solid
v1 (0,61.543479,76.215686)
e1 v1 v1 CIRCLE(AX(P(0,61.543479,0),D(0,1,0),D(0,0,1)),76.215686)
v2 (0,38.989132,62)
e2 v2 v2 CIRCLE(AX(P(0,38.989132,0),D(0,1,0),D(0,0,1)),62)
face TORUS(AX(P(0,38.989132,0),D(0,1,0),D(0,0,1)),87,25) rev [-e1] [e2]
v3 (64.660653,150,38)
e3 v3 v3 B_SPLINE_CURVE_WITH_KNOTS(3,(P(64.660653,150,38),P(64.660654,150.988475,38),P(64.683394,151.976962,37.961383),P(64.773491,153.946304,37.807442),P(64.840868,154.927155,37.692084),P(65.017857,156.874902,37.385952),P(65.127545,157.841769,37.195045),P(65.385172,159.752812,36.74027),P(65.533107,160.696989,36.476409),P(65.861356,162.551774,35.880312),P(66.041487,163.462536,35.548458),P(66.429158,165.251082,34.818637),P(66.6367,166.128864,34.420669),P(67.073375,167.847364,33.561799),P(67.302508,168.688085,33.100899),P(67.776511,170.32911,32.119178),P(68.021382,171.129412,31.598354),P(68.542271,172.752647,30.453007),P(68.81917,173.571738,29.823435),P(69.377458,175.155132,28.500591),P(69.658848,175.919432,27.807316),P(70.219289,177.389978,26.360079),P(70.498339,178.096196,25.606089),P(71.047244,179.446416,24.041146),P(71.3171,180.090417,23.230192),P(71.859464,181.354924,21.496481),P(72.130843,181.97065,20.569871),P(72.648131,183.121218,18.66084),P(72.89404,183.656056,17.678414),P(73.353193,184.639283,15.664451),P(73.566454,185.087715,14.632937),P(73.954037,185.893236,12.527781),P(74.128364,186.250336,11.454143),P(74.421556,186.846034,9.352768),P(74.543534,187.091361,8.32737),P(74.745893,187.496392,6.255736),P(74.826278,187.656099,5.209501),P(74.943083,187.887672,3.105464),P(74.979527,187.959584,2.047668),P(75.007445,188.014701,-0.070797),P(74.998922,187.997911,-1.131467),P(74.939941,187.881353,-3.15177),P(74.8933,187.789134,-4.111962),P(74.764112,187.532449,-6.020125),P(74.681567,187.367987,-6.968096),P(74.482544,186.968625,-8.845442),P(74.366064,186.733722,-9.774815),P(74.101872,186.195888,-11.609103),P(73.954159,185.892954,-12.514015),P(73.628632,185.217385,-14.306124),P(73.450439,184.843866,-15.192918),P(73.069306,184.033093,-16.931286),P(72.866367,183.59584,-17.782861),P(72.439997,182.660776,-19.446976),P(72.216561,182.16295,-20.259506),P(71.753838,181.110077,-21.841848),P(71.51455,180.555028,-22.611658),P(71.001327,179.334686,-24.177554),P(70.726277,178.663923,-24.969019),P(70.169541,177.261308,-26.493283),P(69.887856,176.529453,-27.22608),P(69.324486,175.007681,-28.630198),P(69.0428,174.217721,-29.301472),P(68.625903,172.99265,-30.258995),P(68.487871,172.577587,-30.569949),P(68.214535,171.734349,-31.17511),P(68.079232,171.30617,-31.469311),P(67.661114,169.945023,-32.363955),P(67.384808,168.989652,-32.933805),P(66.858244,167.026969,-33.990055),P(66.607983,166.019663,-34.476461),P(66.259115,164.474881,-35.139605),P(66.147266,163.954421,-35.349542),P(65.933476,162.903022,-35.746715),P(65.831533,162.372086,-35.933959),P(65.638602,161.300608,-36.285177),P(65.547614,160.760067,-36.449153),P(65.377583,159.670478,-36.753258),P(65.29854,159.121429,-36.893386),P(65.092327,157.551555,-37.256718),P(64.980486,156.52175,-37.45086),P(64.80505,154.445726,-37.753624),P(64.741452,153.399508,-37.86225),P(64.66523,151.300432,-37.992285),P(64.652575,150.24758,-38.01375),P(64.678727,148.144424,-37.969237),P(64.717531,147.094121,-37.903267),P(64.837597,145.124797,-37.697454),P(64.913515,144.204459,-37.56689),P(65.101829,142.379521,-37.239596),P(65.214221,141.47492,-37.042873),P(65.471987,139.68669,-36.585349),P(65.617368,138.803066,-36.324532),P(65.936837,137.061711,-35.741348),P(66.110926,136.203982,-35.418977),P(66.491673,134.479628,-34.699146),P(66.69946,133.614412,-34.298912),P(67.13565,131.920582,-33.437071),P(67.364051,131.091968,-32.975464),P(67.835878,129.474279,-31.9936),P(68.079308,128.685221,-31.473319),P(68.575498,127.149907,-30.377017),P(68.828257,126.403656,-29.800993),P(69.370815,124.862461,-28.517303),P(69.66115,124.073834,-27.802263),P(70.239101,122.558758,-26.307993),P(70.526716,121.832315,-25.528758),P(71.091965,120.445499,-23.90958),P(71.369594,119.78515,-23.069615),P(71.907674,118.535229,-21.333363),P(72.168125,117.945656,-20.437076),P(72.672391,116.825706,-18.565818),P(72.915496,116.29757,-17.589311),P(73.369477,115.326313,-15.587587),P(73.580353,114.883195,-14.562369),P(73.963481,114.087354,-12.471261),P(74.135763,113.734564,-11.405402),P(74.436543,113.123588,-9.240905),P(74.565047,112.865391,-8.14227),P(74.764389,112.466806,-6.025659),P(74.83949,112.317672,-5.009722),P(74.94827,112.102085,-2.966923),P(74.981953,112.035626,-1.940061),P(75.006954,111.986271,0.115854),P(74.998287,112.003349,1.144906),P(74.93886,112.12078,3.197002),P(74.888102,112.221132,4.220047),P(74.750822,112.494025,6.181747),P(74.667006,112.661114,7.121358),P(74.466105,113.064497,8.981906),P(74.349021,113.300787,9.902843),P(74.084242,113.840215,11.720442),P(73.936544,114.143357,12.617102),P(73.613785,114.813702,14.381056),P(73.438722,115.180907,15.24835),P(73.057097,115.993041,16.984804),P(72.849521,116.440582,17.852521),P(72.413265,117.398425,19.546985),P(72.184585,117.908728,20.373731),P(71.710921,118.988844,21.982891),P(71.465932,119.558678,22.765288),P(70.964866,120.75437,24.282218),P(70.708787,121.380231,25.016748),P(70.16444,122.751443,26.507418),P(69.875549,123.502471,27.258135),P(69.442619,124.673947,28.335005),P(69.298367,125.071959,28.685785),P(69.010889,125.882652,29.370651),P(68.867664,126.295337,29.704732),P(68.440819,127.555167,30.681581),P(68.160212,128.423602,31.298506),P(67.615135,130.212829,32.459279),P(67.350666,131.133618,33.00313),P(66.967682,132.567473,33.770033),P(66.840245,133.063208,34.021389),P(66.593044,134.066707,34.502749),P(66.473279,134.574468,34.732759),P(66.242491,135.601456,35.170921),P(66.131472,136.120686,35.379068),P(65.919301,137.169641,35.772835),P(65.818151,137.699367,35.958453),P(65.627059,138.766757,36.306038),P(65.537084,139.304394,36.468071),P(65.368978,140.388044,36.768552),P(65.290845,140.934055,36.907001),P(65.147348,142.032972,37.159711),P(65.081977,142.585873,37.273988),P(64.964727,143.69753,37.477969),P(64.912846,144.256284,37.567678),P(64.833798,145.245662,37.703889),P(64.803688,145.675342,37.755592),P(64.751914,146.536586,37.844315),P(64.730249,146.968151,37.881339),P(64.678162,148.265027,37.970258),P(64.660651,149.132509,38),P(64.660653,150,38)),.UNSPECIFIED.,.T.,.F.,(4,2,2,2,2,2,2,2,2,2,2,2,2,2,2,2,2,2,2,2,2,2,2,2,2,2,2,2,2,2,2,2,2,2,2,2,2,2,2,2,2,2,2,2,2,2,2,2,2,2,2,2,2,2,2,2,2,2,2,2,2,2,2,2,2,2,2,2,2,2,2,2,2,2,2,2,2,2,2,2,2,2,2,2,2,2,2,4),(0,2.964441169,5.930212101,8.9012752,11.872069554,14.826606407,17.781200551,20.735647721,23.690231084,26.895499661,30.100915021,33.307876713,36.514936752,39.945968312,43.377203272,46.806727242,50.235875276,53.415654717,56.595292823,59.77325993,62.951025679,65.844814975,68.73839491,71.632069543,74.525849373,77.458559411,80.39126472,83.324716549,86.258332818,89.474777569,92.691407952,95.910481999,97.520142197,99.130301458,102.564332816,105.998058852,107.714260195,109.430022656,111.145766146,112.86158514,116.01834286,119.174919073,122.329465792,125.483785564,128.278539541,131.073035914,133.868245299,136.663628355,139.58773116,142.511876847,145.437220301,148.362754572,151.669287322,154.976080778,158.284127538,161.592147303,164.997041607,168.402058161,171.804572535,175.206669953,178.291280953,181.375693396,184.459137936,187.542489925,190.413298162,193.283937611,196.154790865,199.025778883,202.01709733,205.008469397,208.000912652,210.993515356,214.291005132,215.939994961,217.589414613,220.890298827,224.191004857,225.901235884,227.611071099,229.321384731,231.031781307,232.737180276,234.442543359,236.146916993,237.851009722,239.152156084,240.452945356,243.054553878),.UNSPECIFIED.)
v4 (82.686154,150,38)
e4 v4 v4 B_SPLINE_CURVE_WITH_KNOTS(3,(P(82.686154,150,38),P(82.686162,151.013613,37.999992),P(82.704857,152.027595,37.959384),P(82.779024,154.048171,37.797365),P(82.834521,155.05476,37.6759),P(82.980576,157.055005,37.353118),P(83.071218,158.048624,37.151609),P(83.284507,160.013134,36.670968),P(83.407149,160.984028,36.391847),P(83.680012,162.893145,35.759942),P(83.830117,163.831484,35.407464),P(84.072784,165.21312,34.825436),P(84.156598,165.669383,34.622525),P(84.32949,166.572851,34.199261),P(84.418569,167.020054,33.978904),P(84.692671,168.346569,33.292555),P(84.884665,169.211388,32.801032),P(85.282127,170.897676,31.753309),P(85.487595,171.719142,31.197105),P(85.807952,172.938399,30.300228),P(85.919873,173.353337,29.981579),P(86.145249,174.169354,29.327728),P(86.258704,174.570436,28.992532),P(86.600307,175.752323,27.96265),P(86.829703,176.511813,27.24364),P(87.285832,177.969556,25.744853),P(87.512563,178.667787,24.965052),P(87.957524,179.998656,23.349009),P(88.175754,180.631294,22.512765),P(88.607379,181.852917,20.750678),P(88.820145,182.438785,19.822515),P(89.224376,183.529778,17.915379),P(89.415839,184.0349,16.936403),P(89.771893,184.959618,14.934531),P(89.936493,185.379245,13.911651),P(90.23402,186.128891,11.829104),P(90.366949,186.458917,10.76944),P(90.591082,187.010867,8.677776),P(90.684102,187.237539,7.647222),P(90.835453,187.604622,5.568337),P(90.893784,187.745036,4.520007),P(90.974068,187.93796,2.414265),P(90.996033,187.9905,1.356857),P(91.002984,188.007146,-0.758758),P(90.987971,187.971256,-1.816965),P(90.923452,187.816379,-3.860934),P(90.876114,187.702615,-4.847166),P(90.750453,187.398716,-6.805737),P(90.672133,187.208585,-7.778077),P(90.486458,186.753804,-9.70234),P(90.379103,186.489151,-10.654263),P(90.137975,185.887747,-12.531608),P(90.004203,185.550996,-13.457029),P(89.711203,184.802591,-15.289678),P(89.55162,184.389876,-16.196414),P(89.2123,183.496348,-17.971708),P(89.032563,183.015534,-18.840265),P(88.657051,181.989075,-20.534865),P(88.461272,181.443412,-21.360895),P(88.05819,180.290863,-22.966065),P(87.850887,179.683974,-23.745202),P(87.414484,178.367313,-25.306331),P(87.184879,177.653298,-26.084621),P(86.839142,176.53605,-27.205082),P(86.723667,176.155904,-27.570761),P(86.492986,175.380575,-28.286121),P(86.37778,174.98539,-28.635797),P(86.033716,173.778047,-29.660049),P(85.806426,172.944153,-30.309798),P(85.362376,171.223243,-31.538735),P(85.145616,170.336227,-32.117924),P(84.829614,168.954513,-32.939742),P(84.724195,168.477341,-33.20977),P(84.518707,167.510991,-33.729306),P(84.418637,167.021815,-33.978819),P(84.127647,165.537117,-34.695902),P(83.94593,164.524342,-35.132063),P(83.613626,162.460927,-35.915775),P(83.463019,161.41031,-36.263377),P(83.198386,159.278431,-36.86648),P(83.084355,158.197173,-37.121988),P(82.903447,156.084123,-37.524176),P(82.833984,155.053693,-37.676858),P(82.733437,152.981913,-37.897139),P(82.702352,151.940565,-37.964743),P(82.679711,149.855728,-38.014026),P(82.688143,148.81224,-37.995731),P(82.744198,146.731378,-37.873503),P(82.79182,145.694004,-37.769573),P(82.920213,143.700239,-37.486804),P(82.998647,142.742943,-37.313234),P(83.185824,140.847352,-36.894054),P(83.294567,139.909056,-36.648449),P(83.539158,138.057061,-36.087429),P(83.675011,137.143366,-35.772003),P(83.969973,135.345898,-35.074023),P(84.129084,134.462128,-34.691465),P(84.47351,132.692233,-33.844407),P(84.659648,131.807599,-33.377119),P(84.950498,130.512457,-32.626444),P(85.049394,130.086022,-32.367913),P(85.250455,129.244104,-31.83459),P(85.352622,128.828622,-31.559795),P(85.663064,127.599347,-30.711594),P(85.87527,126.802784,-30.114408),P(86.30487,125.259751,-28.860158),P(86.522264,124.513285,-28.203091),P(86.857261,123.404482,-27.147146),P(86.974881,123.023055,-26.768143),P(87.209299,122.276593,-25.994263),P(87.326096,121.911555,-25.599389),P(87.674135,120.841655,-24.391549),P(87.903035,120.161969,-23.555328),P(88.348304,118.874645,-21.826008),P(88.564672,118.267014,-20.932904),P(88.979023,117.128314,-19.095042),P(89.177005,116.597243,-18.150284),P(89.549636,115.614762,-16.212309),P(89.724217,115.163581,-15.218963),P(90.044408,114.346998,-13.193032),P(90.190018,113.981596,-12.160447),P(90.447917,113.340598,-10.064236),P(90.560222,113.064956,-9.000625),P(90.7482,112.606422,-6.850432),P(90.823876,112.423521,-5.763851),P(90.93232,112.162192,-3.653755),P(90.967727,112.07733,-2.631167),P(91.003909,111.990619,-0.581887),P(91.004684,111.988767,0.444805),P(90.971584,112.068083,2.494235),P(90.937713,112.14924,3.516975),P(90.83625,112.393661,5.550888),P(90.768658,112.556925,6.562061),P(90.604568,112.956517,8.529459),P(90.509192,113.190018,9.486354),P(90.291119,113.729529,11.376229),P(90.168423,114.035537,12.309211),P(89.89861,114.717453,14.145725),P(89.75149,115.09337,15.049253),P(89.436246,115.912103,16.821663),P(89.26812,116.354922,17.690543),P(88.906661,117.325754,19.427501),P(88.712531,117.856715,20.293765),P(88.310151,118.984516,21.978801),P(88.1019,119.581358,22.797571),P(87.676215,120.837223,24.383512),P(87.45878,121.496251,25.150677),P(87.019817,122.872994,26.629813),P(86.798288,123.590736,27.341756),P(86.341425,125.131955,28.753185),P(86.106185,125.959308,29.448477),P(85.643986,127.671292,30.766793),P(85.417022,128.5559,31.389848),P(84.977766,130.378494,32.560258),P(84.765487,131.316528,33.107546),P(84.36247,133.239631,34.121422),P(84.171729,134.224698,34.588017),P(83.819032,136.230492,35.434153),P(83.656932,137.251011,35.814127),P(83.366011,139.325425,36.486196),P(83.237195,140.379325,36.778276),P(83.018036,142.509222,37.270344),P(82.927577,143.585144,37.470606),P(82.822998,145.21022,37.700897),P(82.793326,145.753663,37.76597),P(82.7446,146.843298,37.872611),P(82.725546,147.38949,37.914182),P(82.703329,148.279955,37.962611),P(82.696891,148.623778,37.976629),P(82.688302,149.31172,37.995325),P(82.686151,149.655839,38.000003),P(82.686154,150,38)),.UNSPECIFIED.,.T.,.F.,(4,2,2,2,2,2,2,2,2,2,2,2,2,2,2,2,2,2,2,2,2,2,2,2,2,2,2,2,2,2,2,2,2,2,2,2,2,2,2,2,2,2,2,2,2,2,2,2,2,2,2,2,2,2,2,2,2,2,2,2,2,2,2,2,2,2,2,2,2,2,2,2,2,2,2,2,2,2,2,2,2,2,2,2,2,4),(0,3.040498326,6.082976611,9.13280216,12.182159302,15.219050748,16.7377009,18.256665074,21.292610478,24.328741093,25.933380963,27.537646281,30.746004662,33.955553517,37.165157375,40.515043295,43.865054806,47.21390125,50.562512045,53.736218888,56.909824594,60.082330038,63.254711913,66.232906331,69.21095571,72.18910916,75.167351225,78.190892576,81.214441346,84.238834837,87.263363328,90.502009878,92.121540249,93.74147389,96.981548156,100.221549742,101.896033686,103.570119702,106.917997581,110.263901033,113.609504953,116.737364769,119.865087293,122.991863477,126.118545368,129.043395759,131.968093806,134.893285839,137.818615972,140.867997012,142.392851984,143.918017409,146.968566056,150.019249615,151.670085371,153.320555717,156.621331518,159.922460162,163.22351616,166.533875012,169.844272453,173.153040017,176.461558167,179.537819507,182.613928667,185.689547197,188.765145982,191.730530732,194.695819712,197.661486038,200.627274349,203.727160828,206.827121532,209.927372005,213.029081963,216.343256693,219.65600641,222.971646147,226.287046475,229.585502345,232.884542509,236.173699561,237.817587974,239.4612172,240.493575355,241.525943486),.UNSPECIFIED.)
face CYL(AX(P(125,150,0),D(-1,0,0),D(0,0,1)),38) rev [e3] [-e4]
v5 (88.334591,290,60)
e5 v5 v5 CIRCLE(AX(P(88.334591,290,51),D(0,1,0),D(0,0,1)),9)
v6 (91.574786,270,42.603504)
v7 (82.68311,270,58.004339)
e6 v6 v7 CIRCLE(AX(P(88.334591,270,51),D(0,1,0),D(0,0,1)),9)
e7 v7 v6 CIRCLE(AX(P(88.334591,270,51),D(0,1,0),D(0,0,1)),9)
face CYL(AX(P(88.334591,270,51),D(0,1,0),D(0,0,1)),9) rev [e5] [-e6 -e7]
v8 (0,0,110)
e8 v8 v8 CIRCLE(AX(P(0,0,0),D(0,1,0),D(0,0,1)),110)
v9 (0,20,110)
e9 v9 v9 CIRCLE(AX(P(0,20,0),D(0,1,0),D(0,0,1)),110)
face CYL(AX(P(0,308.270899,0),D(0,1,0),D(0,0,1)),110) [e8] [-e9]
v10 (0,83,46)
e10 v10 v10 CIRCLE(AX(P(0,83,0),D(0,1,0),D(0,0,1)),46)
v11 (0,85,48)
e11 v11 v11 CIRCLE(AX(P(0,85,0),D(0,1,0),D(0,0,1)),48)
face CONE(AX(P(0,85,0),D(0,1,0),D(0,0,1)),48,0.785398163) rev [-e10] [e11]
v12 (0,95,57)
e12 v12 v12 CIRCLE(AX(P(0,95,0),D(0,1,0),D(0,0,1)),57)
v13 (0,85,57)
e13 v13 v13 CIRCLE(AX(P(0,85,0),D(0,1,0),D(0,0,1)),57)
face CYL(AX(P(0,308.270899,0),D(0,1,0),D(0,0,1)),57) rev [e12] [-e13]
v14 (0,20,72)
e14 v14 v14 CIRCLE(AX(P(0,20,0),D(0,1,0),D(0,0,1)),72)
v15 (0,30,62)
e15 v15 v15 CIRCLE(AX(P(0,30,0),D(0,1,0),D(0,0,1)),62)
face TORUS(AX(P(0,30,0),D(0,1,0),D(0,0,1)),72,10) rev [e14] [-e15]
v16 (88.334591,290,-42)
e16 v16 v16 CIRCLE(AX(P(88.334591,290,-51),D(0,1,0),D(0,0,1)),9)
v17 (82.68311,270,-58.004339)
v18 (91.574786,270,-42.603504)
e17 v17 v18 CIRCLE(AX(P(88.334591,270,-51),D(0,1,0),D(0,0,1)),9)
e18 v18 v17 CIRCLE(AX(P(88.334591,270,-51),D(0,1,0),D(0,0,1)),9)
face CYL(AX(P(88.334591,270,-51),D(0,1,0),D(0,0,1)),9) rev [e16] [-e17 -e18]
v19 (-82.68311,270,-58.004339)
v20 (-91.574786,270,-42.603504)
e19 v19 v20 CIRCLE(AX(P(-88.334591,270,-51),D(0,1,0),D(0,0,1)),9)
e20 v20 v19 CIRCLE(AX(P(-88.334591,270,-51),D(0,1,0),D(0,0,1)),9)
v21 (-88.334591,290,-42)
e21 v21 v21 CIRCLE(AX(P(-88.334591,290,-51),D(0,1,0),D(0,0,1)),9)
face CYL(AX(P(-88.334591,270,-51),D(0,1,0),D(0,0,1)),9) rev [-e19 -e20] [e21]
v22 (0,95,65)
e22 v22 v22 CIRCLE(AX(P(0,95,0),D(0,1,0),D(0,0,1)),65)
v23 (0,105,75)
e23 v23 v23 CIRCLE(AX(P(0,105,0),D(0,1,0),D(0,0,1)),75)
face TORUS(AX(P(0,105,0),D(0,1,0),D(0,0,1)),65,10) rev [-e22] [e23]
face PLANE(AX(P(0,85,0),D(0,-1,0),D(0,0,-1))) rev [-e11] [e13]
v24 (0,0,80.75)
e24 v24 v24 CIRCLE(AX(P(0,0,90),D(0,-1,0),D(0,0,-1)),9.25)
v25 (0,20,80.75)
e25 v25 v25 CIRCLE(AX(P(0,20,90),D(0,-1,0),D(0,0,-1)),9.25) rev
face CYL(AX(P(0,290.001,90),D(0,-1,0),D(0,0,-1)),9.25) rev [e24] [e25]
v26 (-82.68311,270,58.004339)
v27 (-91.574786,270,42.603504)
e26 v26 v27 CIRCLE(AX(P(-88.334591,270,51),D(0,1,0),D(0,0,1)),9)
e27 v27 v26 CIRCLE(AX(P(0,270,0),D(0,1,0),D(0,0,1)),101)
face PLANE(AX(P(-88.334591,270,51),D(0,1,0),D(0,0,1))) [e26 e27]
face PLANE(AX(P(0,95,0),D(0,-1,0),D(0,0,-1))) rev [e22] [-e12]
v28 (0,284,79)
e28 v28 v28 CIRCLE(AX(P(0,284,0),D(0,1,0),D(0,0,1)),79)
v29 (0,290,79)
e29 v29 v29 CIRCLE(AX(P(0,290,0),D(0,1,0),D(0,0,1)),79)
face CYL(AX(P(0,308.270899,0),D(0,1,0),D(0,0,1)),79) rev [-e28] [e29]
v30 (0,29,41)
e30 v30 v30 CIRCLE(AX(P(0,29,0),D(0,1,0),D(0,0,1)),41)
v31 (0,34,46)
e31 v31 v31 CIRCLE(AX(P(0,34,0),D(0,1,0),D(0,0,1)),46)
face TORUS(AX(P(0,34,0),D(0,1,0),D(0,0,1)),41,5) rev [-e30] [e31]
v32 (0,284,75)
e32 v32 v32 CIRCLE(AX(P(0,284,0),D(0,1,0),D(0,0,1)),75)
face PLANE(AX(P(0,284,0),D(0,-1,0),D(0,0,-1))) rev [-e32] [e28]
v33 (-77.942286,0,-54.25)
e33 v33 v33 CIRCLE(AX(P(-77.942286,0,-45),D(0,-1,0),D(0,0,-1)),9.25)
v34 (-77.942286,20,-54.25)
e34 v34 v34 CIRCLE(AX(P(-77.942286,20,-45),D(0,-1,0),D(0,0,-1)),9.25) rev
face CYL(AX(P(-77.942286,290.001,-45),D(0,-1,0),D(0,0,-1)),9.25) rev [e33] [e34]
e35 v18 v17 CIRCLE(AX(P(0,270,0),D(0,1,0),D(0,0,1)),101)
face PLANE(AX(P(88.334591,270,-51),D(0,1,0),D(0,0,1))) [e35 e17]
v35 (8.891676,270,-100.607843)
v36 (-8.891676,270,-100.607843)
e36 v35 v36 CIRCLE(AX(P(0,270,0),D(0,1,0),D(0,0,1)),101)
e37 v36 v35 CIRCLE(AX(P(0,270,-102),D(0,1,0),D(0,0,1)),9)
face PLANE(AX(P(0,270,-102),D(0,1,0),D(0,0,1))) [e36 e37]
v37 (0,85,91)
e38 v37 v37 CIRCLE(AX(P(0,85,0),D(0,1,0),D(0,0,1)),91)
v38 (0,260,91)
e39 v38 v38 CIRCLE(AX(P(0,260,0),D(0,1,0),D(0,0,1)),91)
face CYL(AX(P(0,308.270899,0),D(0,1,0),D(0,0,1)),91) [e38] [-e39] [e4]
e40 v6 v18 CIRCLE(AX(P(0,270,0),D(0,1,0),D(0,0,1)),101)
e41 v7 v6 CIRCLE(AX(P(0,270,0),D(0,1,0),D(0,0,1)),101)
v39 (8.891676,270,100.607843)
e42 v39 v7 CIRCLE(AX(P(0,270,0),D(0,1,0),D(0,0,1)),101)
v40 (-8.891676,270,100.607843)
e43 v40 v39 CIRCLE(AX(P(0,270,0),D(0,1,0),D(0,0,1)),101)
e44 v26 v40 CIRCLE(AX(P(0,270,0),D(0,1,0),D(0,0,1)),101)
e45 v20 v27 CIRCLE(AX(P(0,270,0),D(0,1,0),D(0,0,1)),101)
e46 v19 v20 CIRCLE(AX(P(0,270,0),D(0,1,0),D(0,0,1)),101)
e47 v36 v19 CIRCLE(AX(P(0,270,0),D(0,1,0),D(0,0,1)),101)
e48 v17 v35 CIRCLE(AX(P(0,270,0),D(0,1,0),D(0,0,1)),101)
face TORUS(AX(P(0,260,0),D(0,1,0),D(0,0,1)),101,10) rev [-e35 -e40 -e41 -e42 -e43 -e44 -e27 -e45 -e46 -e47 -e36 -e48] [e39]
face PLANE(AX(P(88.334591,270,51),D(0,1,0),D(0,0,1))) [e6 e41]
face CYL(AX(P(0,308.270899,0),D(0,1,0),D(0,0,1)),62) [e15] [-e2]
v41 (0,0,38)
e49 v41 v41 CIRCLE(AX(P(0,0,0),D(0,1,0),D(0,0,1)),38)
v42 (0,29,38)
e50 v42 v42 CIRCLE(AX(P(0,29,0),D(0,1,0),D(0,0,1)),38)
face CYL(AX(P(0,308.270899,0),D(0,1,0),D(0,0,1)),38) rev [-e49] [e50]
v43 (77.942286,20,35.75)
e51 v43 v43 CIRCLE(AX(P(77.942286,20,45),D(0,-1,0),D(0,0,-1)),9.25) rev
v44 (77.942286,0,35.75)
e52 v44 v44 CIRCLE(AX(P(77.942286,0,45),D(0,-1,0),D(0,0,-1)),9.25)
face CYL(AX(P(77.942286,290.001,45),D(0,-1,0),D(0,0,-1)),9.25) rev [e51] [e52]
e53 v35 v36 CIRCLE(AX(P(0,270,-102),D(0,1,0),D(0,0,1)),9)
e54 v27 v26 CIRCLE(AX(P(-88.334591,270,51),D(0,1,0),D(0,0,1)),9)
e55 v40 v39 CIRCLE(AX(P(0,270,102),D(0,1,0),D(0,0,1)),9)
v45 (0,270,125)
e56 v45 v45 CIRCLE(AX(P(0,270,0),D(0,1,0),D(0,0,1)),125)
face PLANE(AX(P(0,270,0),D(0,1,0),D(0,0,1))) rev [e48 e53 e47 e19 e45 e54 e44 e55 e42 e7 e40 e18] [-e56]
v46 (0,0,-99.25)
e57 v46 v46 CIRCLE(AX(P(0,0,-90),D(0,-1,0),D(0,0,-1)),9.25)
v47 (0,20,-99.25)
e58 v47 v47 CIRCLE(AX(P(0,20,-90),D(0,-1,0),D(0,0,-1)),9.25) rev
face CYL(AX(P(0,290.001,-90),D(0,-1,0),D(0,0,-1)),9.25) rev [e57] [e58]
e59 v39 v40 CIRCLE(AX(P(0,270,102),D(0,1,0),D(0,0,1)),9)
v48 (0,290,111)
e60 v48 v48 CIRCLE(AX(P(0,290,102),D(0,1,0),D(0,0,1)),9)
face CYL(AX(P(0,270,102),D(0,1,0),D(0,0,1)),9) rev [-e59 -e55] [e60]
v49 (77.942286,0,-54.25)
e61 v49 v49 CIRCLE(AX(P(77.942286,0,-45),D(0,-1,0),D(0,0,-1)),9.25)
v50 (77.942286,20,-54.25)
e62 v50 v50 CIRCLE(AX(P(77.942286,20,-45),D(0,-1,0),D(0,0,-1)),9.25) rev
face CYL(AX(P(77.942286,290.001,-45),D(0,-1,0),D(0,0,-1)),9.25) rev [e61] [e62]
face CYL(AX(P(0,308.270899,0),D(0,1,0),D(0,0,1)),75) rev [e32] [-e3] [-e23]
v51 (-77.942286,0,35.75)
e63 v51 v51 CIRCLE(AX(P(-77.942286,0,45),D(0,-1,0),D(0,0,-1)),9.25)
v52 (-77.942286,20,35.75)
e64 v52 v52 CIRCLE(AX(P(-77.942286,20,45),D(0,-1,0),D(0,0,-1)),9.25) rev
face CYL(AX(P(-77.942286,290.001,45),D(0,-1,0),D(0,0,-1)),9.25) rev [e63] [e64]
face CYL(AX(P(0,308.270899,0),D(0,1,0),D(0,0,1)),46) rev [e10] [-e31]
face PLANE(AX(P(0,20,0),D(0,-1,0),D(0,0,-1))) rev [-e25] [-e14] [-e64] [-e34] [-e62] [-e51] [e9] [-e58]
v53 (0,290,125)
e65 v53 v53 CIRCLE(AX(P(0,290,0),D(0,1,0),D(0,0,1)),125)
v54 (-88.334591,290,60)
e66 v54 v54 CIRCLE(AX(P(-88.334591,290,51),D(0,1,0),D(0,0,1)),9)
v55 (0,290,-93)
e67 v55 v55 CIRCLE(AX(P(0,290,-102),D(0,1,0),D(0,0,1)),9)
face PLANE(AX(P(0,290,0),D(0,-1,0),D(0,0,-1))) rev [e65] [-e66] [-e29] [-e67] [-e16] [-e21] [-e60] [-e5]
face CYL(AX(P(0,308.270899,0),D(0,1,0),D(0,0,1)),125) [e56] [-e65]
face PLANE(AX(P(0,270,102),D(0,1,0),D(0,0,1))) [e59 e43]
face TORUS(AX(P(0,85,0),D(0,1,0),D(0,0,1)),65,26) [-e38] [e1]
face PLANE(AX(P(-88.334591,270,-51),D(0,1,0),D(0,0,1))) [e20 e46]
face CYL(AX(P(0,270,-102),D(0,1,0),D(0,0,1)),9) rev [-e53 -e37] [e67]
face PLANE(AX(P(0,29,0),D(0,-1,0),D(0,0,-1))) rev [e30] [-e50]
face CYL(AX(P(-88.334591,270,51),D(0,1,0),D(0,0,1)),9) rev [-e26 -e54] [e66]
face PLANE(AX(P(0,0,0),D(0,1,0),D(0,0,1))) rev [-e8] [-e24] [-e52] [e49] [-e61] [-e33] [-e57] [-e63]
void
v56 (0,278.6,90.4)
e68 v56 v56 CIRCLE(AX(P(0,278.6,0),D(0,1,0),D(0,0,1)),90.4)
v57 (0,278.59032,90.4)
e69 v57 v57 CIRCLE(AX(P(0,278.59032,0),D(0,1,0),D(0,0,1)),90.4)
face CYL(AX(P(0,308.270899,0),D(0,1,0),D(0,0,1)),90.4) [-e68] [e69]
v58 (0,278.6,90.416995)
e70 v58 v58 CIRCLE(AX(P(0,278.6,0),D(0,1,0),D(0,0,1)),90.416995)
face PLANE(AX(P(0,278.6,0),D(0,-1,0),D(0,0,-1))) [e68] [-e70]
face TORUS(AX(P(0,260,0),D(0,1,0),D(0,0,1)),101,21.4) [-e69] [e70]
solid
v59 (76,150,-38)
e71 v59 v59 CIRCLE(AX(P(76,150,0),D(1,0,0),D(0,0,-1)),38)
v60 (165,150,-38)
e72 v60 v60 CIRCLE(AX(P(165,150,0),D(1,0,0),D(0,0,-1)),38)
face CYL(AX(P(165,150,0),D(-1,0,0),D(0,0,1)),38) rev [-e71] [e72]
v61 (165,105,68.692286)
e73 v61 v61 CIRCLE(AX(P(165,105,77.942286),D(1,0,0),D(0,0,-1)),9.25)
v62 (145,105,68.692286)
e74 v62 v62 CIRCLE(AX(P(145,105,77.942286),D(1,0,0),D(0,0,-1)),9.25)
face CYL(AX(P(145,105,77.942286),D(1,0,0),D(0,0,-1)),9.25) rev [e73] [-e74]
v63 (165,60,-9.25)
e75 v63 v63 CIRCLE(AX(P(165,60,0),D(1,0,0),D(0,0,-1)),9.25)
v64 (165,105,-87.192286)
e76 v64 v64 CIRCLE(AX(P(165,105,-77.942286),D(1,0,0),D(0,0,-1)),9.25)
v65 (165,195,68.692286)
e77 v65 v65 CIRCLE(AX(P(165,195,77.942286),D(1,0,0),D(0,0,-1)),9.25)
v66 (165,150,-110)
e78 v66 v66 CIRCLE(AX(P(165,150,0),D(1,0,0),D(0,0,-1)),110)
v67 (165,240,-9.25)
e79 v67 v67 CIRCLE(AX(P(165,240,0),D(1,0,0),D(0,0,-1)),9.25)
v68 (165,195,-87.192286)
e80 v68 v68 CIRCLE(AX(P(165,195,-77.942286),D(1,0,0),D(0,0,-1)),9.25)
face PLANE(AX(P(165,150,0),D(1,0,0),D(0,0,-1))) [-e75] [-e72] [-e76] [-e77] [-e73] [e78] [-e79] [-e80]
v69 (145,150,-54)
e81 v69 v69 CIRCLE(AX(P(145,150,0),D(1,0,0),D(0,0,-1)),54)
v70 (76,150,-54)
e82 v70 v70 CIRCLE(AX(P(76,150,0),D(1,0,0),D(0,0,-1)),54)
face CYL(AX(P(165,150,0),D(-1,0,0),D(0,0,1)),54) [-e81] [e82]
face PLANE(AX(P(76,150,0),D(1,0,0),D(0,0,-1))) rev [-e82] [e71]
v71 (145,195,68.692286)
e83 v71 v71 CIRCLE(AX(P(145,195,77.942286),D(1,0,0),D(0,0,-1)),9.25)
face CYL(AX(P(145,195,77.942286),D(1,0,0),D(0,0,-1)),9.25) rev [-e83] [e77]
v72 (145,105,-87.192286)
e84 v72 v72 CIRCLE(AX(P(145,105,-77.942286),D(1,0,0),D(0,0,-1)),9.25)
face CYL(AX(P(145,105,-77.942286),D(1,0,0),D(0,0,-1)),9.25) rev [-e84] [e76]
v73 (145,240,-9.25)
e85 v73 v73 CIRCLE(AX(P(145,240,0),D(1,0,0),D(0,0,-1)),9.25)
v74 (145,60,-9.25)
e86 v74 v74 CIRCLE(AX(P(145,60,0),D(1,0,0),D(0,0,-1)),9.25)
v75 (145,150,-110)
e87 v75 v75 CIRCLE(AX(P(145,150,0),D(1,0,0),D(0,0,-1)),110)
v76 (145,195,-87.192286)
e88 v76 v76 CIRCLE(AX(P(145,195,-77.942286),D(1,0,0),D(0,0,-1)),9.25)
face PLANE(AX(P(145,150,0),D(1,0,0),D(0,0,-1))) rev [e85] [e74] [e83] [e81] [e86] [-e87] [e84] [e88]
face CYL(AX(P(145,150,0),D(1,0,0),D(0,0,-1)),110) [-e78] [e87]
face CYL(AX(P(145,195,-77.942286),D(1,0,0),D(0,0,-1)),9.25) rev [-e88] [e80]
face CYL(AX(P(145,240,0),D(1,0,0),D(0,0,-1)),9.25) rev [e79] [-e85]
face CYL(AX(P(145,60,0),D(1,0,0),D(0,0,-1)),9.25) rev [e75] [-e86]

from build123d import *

# Parameters (mm, degrees)
SKETCH6_R           = 9.25
CUT_EXTRUDE9_DEPTH  = 20
SKETCH9_R           = 9
CUT_EXTRUDE10_DEPTH = 20
SKETCH10_R          = 38
CUT_EXTRUDE11_DEPTH = 340.632153955
SKETCH11_R          = 54
SKETCH11_R_2        = 38
BOSS_EXTRUDE1_DEPTH = 89
BOSS_EXTRUDE2_START = -20
SKETCH12_R          = 110
SKETCH12_R_2        = 38
BOSS_EXTRUDE2_DEPTH = 20
SKETCH13_R          = 9.25
CUT_EXTRUDE12_DEPTH = 20


# Read off the part's stored shape, not the designer's step: Revolve-Thin1
with BuildPart() as part:
    # Revolve-Thin1 outline → Revolve-Thin1 (revolve)
    with BuildSketch(Plane.XY):
        with BuildLine():
            ThreePointArc((46, 34), (44.535533906, 30.464466094), (41, 29))
            Line((41, 29), (38, 29))
            Line((38, 29), (38, 0))
            Line((38, 0), (110, 0))
            Line((110, 0), (110, 20))
            Line((110, 20), (72, 20))
            ThreePointArc((72, 20), (64.928932188, 22.928932188), (62, 30))
            Line((62, 30), (62, 38.989131719))
            ThreePointArc((62, 38.989131719), (65.850439211, 52.319400974), (76.215686275, 61.543478915))
            ThreePointArc((76.215686275, 61.543478915), (86.995543221, 71.136519974), (91, 85))
            Line((91, 85), (91, 260))
            ThreePointArc((91, 260), (93.928932188, 267.071067812), (101, 270))
            Line((101, 270), (125, 270))
            Line((125, 270), (125, 290))
            Line((125, 290), (79, 290))
            Line((79, 290), (79, 284))
            Line((79, 284), (75, 284))
            Line((75, 284), (75, 105))
            ThreePointArc((75, 105), (72.071067812, 97.928932188), (65, 95))
            Line((65, 95), (57, 95))
            Line((57, 95), (57, 85))
            Line((57, 85), (48, 85))
            Line((48, 85), (46, 83))
            Line((46, 83), (46, 34))
        make_face()
        with BuildLine():
            Line((90.4, 278.590320062), (90.4, 278.6))
            Line((90.4, 278.6), (90.416994756, 278.6))
            ThreePointArc((90.416994756, 278.6), (90.408496272, 278.595161972), (90.4, 278.590320062))
        make_face(mode=Mode.SUBTRACT)
    revolve(axis=Axis((0, 0, 0), (0, 1, 0)))

    # Sketch6 → Cut-Extrude9 (cut)
    with BuildSketch(Plane.XZ):
        with Locations(Location((0, 90, 0), (0, 0, 270))):
            Circle(SKETCH6_R)
        with Locations(Location((77.942286341, 45, 0), (0, 0, 270))):
            Circle(SKETCH6_R)
        with Locations(Location((77.942286341, -45, 0), (0, 0, 270))):
            Circle(SKETCH6_R)
        with Locations(Location((0, -90, 0), (0, 0, 270))):
            Circle(SKETCH6_R)
        with Locations(Location((-77.942286341, -45, 0), (0, 0, 270))):
            Circle(SKETCH6_R)
        with Locations(Location((-77.942286341, 45, 0), (0, 0, 270))):
            Circle(SKETCH6_R)
    extrude(amount=-CUT_EXTRUDE9_DEPTH, mode=Mode.SUBTRACT)

    # Sketch9 → Cut-Extrude10 (cut)
    with BuildSketch(Plane(origin=(0, 290, 0), x_dir=(1, 0, 0), z_dir=(0, 1, 0))):
        with Locations(Location((0, 102, 0), (0, 0, 270))):
            Circle(SKETCH9_R)
        with Locations(Location((88.334591186, 51, 0), (0, 0, 270))):
            Circle(SKETCH9_R)
        with Locations(Location((88.334591186, -51, 0), (0, 0, 270))):
            Circle(SKETCH9_R)
        with Locations(Location((0, -102, 0), (0, 0, 270))):
            Circle(SKETCH9_R)
        with Locations(Location((-88.334591186, -51, 0), (0, 0, 270))):
            Circle(SKETCH9_R)
        with Locations(Location((-88.334591186, 51, 0), (0, 0, 270))):
            Circle(SKETCH9_R)
    extrude(amount=-CUT_EXTRUDE10_DEPTH, mode=Mode.SUBTRACT)

    # Sketch10 → Cut-Extrude11 (cut, through all)
    with BuildSketch(Plane(origin=(0, 0, 0), x_dir=(0, 0, -1), z_dir=(1, 0, 0))):
        with Locations(Location((0, 150, 0), (0, 0, 180))):
            Circle(SKETCH10_R)
    extrude(amount=CUT_EXTRUDE11_DEPTH, mode=Mode.SUBTRACT)


with BuildPart() as body_2:
    # Sketch11 → Boss-Extrude1 (new body)
    with BuildSketch(Plane(origin=(76, 0, 0), x_dir=(0, 0, -1), z_dir=(1, 0, 0))):
        with Locations((0, 150)):
            Circle(SKETCH11_R)
        with Locations((0, 150)):
            Circle(SKETCH11_R_2, mode=Mode.SUBTRACT)
    extrude(amount=BOSS_EXTRUDE1_DEPTH)

    # Sketch12 → Boss-Extrude2 (add)
    with BuildSketch(Plane(origin=(165, 0, 0), x_dir=(0, 0, -1), z_dir=(1, 0, 0)).offset(BOSS_EXTRUDE2_START)):
        with Locations((0, 150)):
            Circle(SKETCH12_R)
        with Locations((0, 150)):
            Circle(SKETCH12_R_2, mode=Mode.SUBTRACT)
    extrude(amount=BOSS_EXTRUDE2_DEPTH)

    # Sketch13 → Cut-Extrude12 (cut)
    with BuildSketch(Plane(origin=(165, 0, 0), x_dir=(0, 0, -1), z_dir=(1, 0, 0))):
        with Locations((0, 240)):
            Circle(SKETCH13_R)
        with Locations((77.942286341, 195)):
            Circle(SKETCH13_R)
        with Locations((77.942286341, 105)):
            Circle(SKETCH13_R)
        with Locations((0, 60)):
            Circle(SKETCH13_R)
        with Locations((-77.942286341, 105)):
            Circle(SKETCH13_R)
        with Locations((-77.942286341, 195)):
            Circle(SKETCH13_R)
    extrude(amount=-CUT_EXTRUDE12_DEPTH, mode=Mode.SUBTRACT)


solid = Compound([part.part, body_2.part])
